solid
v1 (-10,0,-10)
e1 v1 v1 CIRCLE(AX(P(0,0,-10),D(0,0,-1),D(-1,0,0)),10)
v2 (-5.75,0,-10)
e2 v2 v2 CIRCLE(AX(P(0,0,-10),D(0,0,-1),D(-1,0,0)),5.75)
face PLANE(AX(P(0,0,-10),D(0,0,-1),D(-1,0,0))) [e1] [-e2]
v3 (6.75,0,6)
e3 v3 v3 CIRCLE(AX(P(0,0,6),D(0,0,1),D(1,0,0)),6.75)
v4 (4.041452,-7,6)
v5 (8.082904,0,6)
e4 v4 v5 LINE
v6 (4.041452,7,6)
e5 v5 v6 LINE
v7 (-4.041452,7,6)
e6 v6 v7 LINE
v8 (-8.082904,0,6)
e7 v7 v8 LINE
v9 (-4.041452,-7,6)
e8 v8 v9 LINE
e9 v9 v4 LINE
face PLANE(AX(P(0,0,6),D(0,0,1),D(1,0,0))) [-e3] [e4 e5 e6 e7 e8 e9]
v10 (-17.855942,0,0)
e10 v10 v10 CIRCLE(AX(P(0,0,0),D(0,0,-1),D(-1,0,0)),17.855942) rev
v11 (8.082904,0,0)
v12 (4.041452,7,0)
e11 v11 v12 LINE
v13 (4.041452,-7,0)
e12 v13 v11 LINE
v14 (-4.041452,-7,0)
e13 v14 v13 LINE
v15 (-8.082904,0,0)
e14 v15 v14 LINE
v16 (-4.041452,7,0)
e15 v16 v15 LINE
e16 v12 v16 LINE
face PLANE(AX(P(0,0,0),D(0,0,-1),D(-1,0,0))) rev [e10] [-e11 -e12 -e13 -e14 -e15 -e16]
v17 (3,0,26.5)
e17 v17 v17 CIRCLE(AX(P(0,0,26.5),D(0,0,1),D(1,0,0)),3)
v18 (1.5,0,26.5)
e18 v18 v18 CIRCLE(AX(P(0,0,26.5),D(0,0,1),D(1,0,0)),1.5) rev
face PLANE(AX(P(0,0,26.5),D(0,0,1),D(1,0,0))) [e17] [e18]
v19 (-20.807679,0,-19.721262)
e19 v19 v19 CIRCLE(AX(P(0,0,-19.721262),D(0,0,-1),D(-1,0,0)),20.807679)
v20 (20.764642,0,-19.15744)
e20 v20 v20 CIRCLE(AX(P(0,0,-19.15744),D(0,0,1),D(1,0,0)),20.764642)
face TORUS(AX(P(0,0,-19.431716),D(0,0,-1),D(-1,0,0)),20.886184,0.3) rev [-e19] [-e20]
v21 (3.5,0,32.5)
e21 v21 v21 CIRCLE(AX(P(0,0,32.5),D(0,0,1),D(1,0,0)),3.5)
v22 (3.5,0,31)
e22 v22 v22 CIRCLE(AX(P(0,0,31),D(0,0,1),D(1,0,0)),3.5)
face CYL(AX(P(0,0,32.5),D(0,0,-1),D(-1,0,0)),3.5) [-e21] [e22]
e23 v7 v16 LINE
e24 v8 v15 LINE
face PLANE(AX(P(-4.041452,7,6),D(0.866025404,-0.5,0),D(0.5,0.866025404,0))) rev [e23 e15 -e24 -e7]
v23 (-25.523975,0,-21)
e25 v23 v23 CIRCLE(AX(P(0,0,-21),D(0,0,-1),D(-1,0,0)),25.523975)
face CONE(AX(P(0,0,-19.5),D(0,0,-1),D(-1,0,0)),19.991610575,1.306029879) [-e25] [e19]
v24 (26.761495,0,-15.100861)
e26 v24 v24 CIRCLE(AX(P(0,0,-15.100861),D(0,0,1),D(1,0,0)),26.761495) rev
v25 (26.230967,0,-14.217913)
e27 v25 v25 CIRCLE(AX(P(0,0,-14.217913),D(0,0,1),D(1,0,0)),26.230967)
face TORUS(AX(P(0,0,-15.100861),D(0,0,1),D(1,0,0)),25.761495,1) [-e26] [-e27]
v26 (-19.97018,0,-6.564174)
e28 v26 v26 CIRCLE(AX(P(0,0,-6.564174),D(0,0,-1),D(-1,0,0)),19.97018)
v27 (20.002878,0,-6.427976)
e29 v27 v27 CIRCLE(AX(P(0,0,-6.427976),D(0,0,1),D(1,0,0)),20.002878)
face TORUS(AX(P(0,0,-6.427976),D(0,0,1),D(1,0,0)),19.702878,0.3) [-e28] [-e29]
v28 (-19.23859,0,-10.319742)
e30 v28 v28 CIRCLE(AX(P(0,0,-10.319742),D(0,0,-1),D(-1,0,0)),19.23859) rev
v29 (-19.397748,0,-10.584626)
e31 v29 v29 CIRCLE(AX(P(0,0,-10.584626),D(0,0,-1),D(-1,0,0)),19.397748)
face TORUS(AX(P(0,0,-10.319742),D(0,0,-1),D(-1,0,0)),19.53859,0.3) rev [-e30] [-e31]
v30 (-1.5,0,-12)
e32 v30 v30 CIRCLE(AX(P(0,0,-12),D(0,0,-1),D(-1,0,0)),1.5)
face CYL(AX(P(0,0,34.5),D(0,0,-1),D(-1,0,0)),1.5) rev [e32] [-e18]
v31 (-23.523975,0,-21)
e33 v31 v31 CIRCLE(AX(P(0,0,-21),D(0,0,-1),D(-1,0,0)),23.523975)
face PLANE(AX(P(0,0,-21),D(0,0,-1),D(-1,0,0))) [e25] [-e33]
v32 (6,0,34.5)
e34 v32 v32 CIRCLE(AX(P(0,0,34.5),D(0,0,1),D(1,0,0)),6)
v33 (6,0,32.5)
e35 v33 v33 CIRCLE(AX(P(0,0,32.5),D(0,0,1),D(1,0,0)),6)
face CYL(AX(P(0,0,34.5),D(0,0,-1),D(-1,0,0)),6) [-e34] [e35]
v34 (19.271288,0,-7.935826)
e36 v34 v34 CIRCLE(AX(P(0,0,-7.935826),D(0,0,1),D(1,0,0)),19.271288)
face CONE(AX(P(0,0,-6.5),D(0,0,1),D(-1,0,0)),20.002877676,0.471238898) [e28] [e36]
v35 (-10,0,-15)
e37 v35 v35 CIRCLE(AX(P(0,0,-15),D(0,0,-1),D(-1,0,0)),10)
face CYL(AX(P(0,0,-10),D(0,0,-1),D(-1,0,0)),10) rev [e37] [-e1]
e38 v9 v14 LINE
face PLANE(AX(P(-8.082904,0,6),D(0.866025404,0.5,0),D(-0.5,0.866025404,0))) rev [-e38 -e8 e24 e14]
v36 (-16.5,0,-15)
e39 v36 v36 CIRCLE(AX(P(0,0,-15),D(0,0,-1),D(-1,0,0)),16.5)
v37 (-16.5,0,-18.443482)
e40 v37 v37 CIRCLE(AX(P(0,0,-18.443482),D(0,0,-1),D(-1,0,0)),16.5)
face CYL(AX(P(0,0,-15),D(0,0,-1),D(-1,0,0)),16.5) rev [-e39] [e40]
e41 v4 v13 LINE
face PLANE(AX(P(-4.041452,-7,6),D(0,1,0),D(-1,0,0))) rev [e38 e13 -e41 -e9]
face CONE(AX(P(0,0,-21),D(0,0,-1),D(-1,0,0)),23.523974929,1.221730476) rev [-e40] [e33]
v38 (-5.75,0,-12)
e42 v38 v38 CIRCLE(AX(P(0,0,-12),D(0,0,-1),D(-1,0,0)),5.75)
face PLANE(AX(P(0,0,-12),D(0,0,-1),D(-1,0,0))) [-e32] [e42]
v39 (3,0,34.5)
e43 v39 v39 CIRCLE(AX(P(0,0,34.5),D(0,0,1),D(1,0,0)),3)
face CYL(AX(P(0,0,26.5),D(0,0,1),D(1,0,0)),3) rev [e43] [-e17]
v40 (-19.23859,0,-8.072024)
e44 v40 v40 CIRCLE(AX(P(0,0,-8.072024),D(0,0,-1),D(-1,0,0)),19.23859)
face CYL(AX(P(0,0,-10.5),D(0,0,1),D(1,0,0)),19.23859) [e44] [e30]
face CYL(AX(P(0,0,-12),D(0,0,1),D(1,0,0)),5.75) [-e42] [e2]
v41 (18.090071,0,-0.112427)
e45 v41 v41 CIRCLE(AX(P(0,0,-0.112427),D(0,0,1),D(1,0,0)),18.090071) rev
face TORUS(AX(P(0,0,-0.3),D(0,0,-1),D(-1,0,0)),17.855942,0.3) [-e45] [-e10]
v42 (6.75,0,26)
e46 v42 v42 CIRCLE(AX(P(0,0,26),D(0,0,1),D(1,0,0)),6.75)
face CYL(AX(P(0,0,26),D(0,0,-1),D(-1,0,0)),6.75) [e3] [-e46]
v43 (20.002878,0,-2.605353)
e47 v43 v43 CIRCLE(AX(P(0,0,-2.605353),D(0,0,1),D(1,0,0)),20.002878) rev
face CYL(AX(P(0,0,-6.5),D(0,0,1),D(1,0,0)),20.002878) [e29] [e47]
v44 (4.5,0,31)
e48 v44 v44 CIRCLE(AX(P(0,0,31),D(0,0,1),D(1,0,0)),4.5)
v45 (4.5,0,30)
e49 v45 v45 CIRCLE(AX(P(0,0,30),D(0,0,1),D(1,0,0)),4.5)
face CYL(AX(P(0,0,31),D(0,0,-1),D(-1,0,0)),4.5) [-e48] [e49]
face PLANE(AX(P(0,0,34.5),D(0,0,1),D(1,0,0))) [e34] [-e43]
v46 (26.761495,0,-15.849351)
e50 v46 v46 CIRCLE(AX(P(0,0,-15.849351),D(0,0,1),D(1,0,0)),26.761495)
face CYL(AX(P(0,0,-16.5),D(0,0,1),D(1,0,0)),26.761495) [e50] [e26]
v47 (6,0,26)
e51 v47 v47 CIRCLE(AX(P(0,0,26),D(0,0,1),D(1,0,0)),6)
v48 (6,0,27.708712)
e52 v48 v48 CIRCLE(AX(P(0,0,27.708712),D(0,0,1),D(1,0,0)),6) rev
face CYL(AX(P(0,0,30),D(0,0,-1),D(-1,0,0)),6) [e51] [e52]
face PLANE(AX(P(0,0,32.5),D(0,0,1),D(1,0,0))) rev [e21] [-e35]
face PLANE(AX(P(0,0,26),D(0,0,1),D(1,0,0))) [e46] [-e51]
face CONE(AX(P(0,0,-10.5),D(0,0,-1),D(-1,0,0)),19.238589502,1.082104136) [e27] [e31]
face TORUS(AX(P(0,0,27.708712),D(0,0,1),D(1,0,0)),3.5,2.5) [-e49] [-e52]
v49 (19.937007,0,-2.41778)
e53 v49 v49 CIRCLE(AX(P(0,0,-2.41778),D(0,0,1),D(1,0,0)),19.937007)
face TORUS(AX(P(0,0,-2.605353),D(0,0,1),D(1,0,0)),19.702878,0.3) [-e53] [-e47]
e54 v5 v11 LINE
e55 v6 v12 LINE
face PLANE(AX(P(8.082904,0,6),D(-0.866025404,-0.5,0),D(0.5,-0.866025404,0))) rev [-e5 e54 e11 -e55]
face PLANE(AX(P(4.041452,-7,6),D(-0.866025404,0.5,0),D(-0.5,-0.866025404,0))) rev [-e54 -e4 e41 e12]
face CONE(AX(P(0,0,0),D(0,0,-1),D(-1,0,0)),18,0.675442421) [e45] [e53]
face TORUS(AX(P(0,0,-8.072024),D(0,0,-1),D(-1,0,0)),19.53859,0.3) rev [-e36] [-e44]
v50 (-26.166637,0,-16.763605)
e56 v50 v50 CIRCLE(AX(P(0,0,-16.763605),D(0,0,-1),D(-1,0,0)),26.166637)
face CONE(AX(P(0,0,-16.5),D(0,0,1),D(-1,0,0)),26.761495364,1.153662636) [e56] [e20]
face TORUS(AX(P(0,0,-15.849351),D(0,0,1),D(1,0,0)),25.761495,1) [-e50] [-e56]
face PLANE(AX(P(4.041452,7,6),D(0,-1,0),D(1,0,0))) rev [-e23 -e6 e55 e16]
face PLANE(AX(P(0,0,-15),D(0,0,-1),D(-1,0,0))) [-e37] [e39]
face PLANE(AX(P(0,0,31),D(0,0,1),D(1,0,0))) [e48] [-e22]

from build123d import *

# Parameters (mm, degrees)
EXTRUDE_1_DEPTH     = 6
SKETCH_2_R          = 6.75
EXTRUDE_2_DEPTH     = 20
SKETCH_3_R          = 6
EXTRUDE_3_DEPTH     = 4
SKETCH_4_R          = 4.5
EXTRUDE_4_DEPTH     = 1
SKETCH_5_R          = 3.5
EXTRUDE_5_DEPTH     = 1.5
SKETCH_6_R          = 6
EXTRUDE_6_DEPTH     = 2
SKETCH_7_R          = 18
EXTRUDE_8_DEPTH     = 2.5
EXTRUDE_8_DRAFT     = -38.7
SKETCH_9_R          = 20.002877676
EXTRUDE_9_DEPTH     = 4
SKETCH_10_R         = 20.002877676
EXTRUDE_10_DEPTH    = 1.5
EXTRUDE_10_TAPER    = 27
SKETCH_11_R         = 19.238589502
EXTRUDE_11_DEPTH    = 2.5
SKETCH_12_R         = 19.238589502
EXTRUDE_12_DEPTH    = 4
EXTRUDE_12_DRAFT    = -62
SKETCH_13_R         = 26.761495364
EXTRUDE_13_DEPTH    = 2
SKETCH_14_R         = 26.761495364
EXTRUDE_14_DEPTH    = 3
EXTRUDE_14_TAPER    = 66.1
SKETCH_15_R         = 19.991610575
EXTRUDE_15_DEPTH    = 1.5
EXTRUDE_15_DRAFT    = -74.83
FILLET_1_R          = 1
FILLET_2_R          = 0.3
FILLET_3_R          = 0.3
SKETCH_16_R         = 1.5
CUT_EXTRUDE_2_DEPTH = 68.175928115
SKETCH_17_R         = 3
CUT_EXTRUDE_3_DEPTH = 8
FILLET_4_R          = 2.5
SKETCH_18_R         = 16.5
CUT_EXTRUDE_4_DEPTH = 6
SKETCH_19_R         = 10
CUT_EXTRUDE_5_DEPTH = 5
EXTRUDE_START       = 2
SKETCH_20_R         = 5.75
SKETCH_20_R_2       = 1.5
EXTRUDE_16_DEPTH    = 2
SKETCH_21_R         = 23.523974929
CUT_EXTRUDE_6_DEPTH = 3
CUT_EXTRUDE_6_DRAFT = -70


with BuildPart() as part:
    # 草图1 → 凸台-拉伸1 (new body)
    with BuildSketch(Plane.XY):
        Polygon((8.082903769, 0), (4.041451884, 7), (-4.041451884, 7), (-8.082903769, 0), (-4.041451884, -7), (4.041451884, -7), align=None)
    extrude(amount=EXTRUDE_1_DEPTH)

    # 草图2 → 凸台-拉伸2 (add)
    with BuildSketch(Plane.XY.offset(6)):
        Circle(SKETCH_2_R)
    extrude(amount=EXTRUDE_2_DEPTH)

    # 草图3 → 凸台-拉伸3 (add)
    with BuildSketch(Plane.XY.offset(26)):
        Circle(SKETCH_3_R)
    extrude(amount=EXTRUDE_3_DEPTH)

    # 草图4 → 凸台-拉伸4 (add)
    with BuildSketch(Plane.XY.offset(30)):
        Circle(SKETCH_4_R)
    extrude(amount=EXTRUDE_4_DEPTH)

    # 草图5 → 凸台-拉伸5 (add)
    with BuildSketch(Plane.XY.offset(31)):
        Circle(SKETCH_5_R)
    extrude(amount=EXTRUDE_5_DEPTH)

    # 草图6 → 凸台-拉伸6 (add)
    with BuildSketch(Plane.XY.offset(32.5)):
        Circle(SKETCH_6_R)
    extrude(amount=EXTRUDE_6_DEPTH)


with BuildPart() as extrude_8_tool:
    # 草图7 → 凸台-拉伸8 (with draft: the straight prism first)
    with BuildSketch(Plane(origin=(0, 0, 0), x_dir=(-1, 0, 0), z_dir=(0, 0, -1))):
        Circle(SKETCH_7_R)
    extrude(amount=EXTRUDE_8_DEPTH)
    # 凸台-拉伸8: the draft: its side faces are tilted about the plane it starts from
    extrude_8_sides = [extrude_8_tool.faces().sort_by_distance(p)[0] for p in [
        (18, 0, -1.25),
    ]]
    draft(extrude_8_sides, Plane(origin=(0, 0, 0), x_dir=(-1, 0, 0), z_dir=(0, 0, -1)), EXTRUDE_8_DRAFT)


with BuildPart() as part_1:
    add(part.part)

    # 凸台-拉伸8: add extrude_8_tool
    add(extrude_8_tool.part)

    # 草图9 → 凸台-拉伸9 (add)
    with BuildSketch(Plane(origin=(0, 0, -2.5), x_dir=(-1, 0, 0), z_dir=(0, 0, -1))):
        Circle(SKETCH_9_R)
    extrude(amount=EXTRUDE_9_DEPTH)

    # 草图10 → 凸台-拉伸10 (add)
    with BuildSketch(Plane(origin=(0, 0, -6.5), x_dir=(-1, 0, 0), z_dir=(0, 0, -1))):
        Circle(SKETCH_10_R)
    extrude(amount=EXTRUDE_10_DEPTH, taper=EXTRUDE_10_TAPER)

    # 草图11 → 凸台-拉伸11 (add)
    with BuildSketch(Plane(origin=(0, 0, -8), x_dir=(-1, 0, 0), z_dir=(0, 0, -1))):
        Circle(SKETCH_11_R)
    extrude(amount=EXTRUDE_11_DEPTH)


with BuildPart() as extrude_12_tool:
    # 草图12 → 凸台-拉伸12 (with draft: the straight prism first)
    with BuildSketch(Plane(origin=(0, 0, -10.5), x_dir=(-1, 0, 0), z_dir=(0, 0, -1))):
        Circle(SKETCH_12_R)
    extrude(amount=EXTRUDE_12_DEPTH)
    # 凸台-拉伸12: the draft: its side faces are tilted about the plane it starts from
    extrude_12_sides = [extrude_12_tool.faces().sort_by_distance(p)[0] for p in [
        (19.238589502, 0, -12.5),
    ]]
    draft(extrude_12_sides, Plane(origin=(0, 0, -10.5), x_dir=(-1, 0, 0), z_dir=(0, 0, -1)), EXTRUDE_12_DRAFT)


with BuildPart() as part_2:
    add(part_1.part)

    # 凸台-拉伸12: add extrude_12_tool
    add(extrude_12_tool.part)

    # 草图13 → 凸台-拉伸13 (add)
    with BuildSketch(Plane(origin=(0, 0, -14.5), x_dir=(-1, 0, 0), z_dir=(0, 0, -1))):
        Circle(SKETCH_13_R)
    extrude(amount=EXTRUDE_13_DEPTH)

    # 草图14 → 凸台-拉伸14 (add)
    with BuildSketch(Plane(origin=(0, 0, -16.5), x_dir=(-1, 0, 0), z_dir=(0, 0, -1))):
        Circle(SKETCH_14_R)
    extrude(amount=EXTRUDE_14_DEPTH, taper=EXTRUDE_14_TAPER)


with BuildPart() as extrude_15_tool:
    # 草图15 → 凸台-拉伸15 (with draft: the straight prism first)
    with BuildSketch(Plane(origin=(0, 0, -19.5), x_dir=(-1, 0, 0), z_dir=(0, 0, -1))):
        Circle(SKETCH_15_R)
    extrude(amount=EXTRUDE_15_DEPTH)
    # 凸台-拉伸15: the draft: its side faces are tilted about the plane it starts from
    extrude_15_sides = [extrude_15_tool.faces().sort_by_distance(p)[0] for p in [
        (19.991610575, 0, -20.25),
    ]]
    draft(extrude_15_sides, Plane(origin=(0, 0, -19.5), x_dir=(-1, 0, 0), z_dir=(0, 0, -1)), EXTRUDE_15_DRAFT)


with BuildPart() as part_3:
    add(part_2.part)

    # 凸台-拉伸15: add extrude_15_tool
    add(extrude_15_tool.part)

    # 圆角1
    fillet_1_edges = [part_3.edges().sort_by_distance(p)[0] for p in [
        (26.761495364, 0, -14.5),
        (26.761495364, 0, -16.5),
    ]]
    fillet(fillet_1_edges, radius=FILLET_1_R)

    # 圆角2
    fillet_2_edges = [part_3.edges().sort_by_distance(p)[0] for p in [
        (19.991610575, 0, -19.5),
    ]]
    fillet(fillet_2_edges, radius=FILLET_2_R)

    # 圆角3
    fillet_3_edges = [part_3.edges().sort_by_distance(p)[0] for p in [
        (18, 0, 0),
        (20.002877676, 0, -2.5),
        (20.002877676, 0, -6.5),
        (19.238589502, 0, -8),
        (19.238589502, 0, -10.5),
    ]]
    fillet(fillet_3_edges, radius=FILLET_3_R)

    # 草图16 → 切除-拉伸2 (cut, through all)
    with BuildSketch(Plane(origin=(0, 0, -21), x_dir=(-1, 0, 0), z_dir=(0, 0, -1))):
        Circle(SKETCH_16_R)
    extrude(amount=-CUT_EXTRUDE_2_DEPTH, mode=Mode.SUBTRACT)

    # 草图17 → 切除-拉伸3 (cut)
    with BuildSketch(Plane.XY.offset(34.5)):
        Circle(SKETCH_17_R)
    extrude(amount=-CUT_EXTRUDE_3_DEPTH, mode=Mode.SUBTRACT)

    # 圆角4
    # the kernel refuses this fillet: 2.5 mm, written as the material it takes off along each edge
    with BuildSketch(Plane(origin=(0, 0, 30), x_dir=(1, 0, 0), z_dir=(0, -1, 0))) as fillet_4_piece_1:
        with BuildLine():
            CenterArc((3.5, -2.291287847), FILLET_4_R, 0, 66.421821522)
            Line((4.5, 0), (4.52, 0.045825757))
            ThreePointArc((4.52, 0.045825757), (5.25, 0.05), (6, 0.05))
            Line((6, 0.05), (6.05, 0))
            Line((6.05, 0), (6.05, -2.291287847))
            Line((6.05, -2.291287847), (6, -2.291287847))
        make_face()
    revolve(axis=Axis((0, 0, 30), (0, 0, 1)), mode=Mode.SUBTRACT)

    # 草图18 → 切除-拉伸4 (cut)
    with BuildSketch(Plane(origin=(0, 0, -21), x_dir=(-1, 0, 0), z_dir=(0, 0, -1))):
        Circle(SKETCH_18_R)
    extrude(amount=-CUT_EXTRUDE_4_DEPTH, mode=Mode.SUBTRACT)

    # 草图19 → 切除-拉伸5 (cut)
    with BuildSketch(Plane(origin=(0, 0, -15), x_dir=(-1, 0, 0), z_dir=(0, 0, -1))):
        Circle(SKETCH_19_R)
    extrude(amount=-CUT_EXTRUDE_5_DEPTH, mode=Mode.SUBTRACT)

    # 草图20 → 凸台-拉伸16 (add)
    with BuildSketch(Plane(origin=(0, 0, -10), x_dir=(-1, 0, 0), z_dir=(0, 0, -1)).offset(EXTRUDE_START)):
        Circle(SKETCH_20_R)
        Circle(SKETCH_20_R_2, mode=Mode.SUBTRACT)
    extrude(amount=-EXTRUDE_16_DEPTH)


with BuildPart() as cut_extrude_6_tool:
    # 草图21 → 切除-拉伸6 (with draft: the straight prism first)
    with BuildSketch(Plane(origin=(0, 0, -21), x_dir=(-1, 0, 0), z_dir=(0, 0, -1))):
        Circle(SKETCH_21_R)
    extrude(amount=-CUT_EXTRUDE_6_DEPTH)
    # 切除-拉伸6: the draft: its side faces are tilted about the plane it starts from
    cut_extrude_6_sides = [cut_extrude_6_tool.faces().sort_by_distance(p)[0] for p in [
        (23.523974929, 0, -19.5),
    ]]
    draft(cut_extrude_6_sides, Plane(origin=(0, 0, -21), x_dir=(-1, 0, 0), z_dir=(0, 0, -1)), CUT_EXTRUDE_6_DRAFT)


with BuildPart() as part_4:
    add(part_3.part)

    # 切除-拉伸6: cut by cut_extrude_6_tool
    add(cut_extrude_6_tool.part, mode=Mode.SUBTRACT)


solid = part_4.part
